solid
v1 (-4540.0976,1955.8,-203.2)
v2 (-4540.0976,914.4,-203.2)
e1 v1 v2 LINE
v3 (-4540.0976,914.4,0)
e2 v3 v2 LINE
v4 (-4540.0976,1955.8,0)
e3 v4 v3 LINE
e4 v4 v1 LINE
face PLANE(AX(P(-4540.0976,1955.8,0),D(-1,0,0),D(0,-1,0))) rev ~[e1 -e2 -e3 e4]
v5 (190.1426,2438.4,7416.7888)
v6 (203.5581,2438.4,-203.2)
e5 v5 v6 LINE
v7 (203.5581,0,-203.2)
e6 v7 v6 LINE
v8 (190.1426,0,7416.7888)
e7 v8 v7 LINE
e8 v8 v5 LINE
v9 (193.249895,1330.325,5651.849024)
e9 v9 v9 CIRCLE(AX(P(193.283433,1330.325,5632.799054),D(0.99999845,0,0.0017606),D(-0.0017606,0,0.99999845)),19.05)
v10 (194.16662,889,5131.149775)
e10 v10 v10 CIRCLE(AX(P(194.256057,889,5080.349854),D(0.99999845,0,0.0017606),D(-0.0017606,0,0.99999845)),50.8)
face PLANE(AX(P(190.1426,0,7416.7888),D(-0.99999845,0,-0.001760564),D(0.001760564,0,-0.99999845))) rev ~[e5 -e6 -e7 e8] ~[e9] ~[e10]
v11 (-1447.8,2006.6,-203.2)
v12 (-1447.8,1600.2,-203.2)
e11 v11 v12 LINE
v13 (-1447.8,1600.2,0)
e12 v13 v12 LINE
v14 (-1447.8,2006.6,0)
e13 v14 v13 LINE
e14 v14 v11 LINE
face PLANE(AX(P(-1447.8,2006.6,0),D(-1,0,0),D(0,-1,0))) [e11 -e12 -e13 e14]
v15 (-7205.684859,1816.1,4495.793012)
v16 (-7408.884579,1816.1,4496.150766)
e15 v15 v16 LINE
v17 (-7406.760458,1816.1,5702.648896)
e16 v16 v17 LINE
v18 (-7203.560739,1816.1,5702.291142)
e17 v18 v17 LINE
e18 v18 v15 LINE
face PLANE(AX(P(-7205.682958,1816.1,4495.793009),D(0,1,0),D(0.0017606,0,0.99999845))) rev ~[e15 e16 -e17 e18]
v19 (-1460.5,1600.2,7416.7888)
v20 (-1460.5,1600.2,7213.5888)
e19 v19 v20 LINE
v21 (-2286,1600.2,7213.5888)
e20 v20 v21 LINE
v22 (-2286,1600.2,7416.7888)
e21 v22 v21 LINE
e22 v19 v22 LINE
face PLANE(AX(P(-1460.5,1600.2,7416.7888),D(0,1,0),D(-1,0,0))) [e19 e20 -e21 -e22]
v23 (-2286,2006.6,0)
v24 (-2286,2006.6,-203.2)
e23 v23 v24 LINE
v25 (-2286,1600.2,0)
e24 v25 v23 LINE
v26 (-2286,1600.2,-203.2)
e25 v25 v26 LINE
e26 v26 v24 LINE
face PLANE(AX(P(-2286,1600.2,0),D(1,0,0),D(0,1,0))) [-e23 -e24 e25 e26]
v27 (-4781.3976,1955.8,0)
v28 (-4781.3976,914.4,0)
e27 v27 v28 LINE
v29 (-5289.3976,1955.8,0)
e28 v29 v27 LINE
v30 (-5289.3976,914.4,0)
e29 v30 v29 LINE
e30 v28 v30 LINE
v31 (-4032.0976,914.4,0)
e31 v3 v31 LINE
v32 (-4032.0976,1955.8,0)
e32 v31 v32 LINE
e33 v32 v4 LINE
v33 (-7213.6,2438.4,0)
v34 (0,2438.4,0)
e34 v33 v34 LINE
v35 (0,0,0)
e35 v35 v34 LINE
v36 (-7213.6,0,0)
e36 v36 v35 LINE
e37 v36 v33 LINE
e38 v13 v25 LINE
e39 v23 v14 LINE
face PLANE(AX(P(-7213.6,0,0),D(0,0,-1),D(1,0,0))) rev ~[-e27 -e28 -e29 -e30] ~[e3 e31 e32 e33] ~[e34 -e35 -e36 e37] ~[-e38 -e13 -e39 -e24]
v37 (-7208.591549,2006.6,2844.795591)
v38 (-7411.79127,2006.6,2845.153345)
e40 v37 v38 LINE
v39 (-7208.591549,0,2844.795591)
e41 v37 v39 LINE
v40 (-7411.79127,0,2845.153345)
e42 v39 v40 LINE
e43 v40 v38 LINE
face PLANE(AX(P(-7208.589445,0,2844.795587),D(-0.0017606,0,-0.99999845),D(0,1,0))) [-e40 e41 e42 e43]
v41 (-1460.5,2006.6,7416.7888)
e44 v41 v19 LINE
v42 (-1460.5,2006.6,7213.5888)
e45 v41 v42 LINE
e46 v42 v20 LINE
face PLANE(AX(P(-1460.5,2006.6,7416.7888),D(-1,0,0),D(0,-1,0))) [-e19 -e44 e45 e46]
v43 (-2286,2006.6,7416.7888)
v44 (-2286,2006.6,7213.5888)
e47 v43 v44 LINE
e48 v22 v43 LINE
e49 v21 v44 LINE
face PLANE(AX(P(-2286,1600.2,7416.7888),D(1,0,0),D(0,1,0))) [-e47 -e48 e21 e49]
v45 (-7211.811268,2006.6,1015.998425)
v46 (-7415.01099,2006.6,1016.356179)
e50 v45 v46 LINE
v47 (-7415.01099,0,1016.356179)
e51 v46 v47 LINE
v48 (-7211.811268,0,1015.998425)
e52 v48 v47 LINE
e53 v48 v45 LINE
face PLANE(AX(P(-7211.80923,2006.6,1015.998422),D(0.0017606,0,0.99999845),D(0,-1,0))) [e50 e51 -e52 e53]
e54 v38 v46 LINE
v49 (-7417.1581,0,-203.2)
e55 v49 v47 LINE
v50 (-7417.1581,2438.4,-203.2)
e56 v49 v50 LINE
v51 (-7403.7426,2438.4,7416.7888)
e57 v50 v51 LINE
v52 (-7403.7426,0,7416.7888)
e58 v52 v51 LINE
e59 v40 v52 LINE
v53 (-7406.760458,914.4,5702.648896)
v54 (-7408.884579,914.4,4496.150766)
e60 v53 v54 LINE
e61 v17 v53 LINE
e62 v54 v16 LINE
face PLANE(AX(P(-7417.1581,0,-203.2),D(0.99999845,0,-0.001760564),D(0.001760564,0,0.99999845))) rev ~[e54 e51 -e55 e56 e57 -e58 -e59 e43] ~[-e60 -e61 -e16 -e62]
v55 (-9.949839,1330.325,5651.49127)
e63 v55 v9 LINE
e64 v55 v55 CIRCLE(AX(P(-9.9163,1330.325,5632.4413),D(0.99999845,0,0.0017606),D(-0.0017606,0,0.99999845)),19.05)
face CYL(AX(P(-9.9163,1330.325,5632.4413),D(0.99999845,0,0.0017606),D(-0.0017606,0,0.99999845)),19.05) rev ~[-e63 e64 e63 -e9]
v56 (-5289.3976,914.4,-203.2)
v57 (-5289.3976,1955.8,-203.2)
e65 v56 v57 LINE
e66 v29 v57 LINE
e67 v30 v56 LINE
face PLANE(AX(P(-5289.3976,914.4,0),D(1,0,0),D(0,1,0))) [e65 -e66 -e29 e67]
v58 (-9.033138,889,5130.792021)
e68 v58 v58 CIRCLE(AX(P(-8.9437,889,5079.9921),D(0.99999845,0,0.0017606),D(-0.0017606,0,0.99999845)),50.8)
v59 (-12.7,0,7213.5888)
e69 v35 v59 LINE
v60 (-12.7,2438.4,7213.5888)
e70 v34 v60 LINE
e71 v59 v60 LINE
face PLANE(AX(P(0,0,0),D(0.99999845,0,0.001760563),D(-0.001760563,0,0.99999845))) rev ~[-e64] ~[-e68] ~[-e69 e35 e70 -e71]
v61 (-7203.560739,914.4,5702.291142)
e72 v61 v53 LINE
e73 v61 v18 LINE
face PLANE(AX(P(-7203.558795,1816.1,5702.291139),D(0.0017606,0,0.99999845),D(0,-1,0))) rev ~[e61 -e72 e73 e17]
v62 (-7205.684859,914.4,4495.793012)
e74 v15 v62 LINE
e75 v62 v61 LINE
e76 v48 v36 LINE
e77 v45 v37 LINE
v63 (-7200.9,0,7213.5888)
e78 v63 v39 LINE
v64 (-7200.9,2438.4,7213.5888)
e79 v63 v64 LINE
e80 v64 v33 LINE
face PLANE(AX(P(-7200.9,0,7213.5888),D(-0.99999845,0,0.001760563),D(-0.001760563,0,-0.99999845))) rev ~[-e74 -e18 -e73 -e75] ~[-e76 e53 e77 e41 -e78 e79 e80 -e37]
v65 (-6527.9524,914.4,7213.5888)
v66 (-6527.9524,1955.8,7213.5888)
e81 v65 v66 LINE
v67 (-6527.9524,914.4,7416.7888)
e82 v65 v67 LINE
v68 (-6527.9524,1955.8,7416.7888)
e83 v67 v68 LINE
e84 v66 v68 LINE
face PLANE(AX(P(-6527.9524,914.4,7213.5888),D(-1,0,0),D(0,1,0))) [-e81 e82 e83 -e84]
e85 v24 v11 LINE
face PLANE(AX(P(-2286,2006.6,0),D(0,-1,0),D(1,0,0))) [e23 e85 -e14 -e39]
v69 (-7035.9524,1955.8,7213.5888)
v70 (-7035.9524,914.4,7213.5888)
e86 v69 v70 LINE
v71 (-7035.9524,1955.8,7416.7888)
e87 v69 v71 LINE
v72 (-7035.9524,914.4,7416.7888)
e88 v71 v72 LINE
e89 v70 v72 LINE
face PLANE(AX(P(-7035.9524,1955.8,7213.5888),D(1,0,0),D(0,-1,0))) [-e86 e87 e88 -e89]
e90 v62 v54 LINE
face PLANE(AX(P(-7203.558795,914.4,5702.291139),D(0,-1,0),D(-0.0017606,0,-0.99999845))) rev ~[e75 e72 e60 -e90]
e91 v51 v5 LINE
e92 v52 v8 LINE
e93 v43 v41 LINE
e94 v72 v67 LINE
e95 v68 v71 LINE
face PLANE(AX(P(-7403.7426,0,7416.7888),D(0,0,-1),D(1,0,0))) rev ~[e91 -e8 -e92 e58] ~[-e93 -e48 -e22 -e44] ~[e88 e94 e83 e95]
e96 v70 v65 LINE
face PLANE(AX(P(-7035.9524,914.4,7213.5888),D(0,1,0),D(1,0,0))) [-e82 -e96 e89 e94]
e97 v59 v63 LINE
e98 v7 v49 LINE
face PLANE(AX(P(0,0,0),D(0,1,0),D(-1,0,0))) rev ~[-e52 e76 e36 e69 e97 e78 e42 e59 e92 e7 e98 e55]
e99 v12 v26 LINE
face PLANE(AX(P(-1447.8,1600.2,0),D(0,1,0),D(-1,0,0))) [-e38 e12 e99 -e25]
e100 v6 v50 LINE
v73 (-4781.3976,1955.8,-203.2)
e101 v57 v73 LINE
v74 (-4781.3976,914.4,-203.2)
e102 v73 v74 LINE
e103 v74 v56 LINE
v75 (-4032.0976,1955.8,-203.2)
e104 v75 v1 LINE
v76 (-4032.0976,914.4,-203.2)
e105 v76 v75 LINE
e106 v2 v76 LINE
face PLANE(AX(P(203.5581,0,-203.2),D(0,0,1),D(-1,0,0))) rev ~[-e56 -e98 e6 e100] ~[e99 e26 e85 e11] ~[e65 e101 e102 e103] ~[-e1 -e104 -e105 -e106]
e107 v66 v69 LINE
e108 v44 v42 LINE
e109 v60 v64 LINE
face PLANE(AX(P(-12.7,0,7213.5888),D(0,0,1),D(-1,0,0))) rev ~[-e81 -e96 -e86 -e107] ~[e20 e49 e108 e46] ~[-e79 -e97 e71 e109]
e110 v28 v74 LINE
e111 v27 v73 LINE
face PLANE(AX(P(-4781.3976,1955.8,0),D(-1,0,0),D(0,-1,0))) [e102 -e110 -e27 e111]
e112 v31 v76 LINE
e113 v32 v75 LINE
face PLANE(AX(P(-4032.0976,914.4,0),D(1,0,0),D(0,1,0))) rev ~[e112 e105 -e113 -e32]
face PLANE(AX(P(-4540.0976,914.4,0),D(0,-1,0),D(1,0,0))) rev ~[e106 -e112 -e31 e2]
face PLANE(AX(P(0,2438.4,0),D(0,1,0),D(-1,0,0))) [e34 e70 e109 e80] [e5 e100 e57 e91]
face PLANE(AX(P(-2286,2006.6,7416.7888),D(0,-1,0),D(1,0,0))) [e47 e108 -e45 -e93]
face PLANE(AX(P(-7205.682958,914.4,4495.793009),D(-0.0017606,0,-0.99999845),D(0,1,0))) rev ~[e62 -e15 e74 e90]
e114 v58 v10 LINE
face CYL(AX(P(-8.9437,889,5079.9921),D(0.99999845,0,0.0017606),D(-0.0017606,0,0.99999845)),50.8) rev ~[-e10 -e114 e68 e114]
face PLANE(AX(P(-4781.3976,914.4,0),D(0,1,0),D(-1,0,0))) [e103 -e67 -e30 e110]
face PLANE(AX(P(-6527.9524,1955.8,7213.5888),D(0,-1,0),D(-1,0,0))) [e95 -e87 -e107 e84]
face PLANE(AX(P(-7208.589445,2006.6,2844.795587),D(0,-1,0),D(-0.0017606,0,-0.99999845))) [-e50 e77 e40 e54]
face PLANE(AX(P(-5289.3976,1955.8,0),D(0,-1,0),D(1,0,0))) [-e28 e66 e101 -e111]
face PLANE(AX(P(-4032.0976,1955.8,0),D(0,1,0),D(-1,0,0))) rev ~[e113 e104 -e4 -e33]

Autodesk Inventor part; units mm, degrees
ref_plane "YZ Plane" through (0, 0, 0) normal (1, 0, 0) x (0, 1, 0)
ref_plane "XZ Plane" through (0, 0, 0) normal (0, 1, 0) x (-1, 0, 0)
ref_plane "XY Plane" through (0, 0, 0) normal (0, 0, 1) x (1, 0, 0)
sketch "Sketch1" plane through (0, 0, 0) normal (0, 1, 0) x (-1, 0, 0)
  line L0 (0, 0) -> (12.7, 7213.5888)
  line L1 (12.7, 7213.5888) -> (7200.9, 7213.5888)
  line L2 (7200.9, 7213.5888) -> (7213.6, 0)
  line L3 (7213.6, 0) -> (0, 0)
  line L4 (7403.7426, 7416.7888) -> (-190.1426, 7416.7888)
  line L5 (-190.1426, 7416.7888) -> (-203.5581, -203.2)
  line L6 (-203.5581, -203.2) -> (7417.1581, -203.2)
  line L7 (7417.1581, -203.2) -> (7403.7426, 7416.7888)
  dimension "d1" = 7188.2
  dimension "d3" = 12.7
  dimension "d4" = 7213.6
  dimension "d5" = 7213.6
  dimension "d6" = 203.2
  dimension "d8" = 7213.6
extrude "Extrusion1" add sketch "Sketch1" along normal blind 2438.4
sketch "Sketch4" plane through (-12.7, 0, 7213.5888) normal (-0.9999985, 0, -0.0017606) x (-0.0017606, 0, 0.9999985)
  line L0 (-7213.6, 0) -> (0, 0) projected
  line L1 (-7213.6, 0) -> (-7213.6, 2438.4) projected
  line L2 (0, 0) -> (0, 2438.4) projected
  point P0 (-1581.15, 1330.325)
  dimension "d27" = 1330.325
  dimension "d139" = 1581.15
hole "Hole1" at (-9.9163, 1330.325, 5632.4413) direction (0.9999985, 0, 0.0017606) diameter 38.1 end through all
sketch "Sketch5" plane through (-12.7, 0, 7213.5888) normal (-0.9999985, 0, -0.0017606) x (-0.0017606, 0, 0.9999985)
  line L0 (-7213.6, 0) -> (0, 0) projected
  line L1 (-7213.6, 0) -> (-7213.6, 2438.4) projected
  point P0 (-2133.6, 889)
  dimension "d36" = 889
  dimension "d37" = 5080
hole "Hole2" at (-8.9437, 889, 5079.9921) direction (0.9999985, 0, 0.0017606) diameter 101.6 end through all
sketch "Sketch6" plane through (-7213.6, 0, 0) normal (0, 0, 1) x (1, 0, 0)
  line L0 (7417.1581, 2438.4) -> (-203.5581, 2438.4) projected
  line L1 (7213.6, 0) -> (7213.6, 2438.4) projected
  line L2 (0, 0) -> (7213.6, 0) projected
  line L3 (4927.6, 2006.6) -> (5765.8, 2006.6)
  line L4 (5765.8, 2006.6) -> (5765.8, 1600.2)
  line L5 (5765.8, 1600.2) -> (4927.6, 1600.2)
  line L6 (4927.6, 1600.2) -> (4927.6, 2006.6)
  dimension "d119" = 1447.8
  dimension "d121" = 406.4
  dimension "d136" = 838.2
  dimension "d137" = 1600.2
extrude "Extrusion3" cut sketch "Sketch6" against normal up to surface (203.2 mm away)
sketch "Sketch7" plane through (-7213.6, 0, 0) normal (0.9999985, 0, -0.0017606) x (-0.0017606, 0, -0.9999985)
  line L0 (-7213.6, 0) -> (0, 0) projected
  line L1 (-1016, 0) -> (-2844.8, 0)
  line L2 (-2844.8, 0) -> (-2844.8, 2006.6)
  line L3 (-2844.8, 2006.6) -> (-1016, 2006.6)
  line L4 (-1016, 2006.6) -> (-1016, 0)
  line L5 (0, 0) -> (0, 2438.4) projected
  point P0 (-12.7, 0)
  point P1 (-2844.8, 0)
  dimension "d51" = 1016
  dimension "d52" = 2006.6
  dimension "d53" = 1828.8
extrude "Extrusion4" cut sketch "Sketch7" against normal up to surface (203.2 mm away)
sketch "Sketch8" plane through (-7200.9, 0, 7213.5888) normal (0.9999985, 0, -0.0017606) x (-0.0017606, 0, -0.9999985)
  line L0 (2717.8, 1816.1) -> (1511.3, 1816.1)
  line L1 (1511.3, 1816.1) -> (1511.3, 914.4)
  line L2 (1511.3, 914.4) -> (2717.8, 914.4)
  line L3 (2717.8, 914.4) -> (2717.8, 1816.1)
  line L4 (0, 0) -> (0, 2438.4) projected
  line L5 (0, 0) -> (4368.8, 0) projected
  point P0 (7200.9, 0)
  dimension "d56" = 2717.8
  dimension "d57" = 1206.5
  dimension "d58" = 901.7
  dimension "d59" = 914.4
extrude "Extrusion5" cut sketch "Sketch8" against normal up to surface (203.2 mm away)
sketch "Sketch9" plane through (-7213.6, 0, 0) normal (0, 0, 1) x (1, 0, 0)
  line L0 (3181.5024, 1955.8) -> (2673.5024, 1955.8)
  line L1 (2673.5024, 1955.8) -> (2673.5024, 914.4)
  line L2 (2673.5024, 914.4) -> (3181.5024, 914.4)
  line L3 (3181.5024, 914.4) -> (3181.5024, 1955.8)
  line L4 (0, 0) -> (7213.6, 0) projected
  line L5 (7213.6, 0) -> (7213.6, 2438.4) projected
  dimension "d63" = 1041.4
  dimension "d64" = 508
  dimension "d65" = 914.4
  dimension "d66" = 4540.0976
extrude "Extrusion6" cut sketch "Sketch9" against normal up to surface (203.2 mm away)
sketch "Sketch10" plane through (-7213.6, 0, 0) normal (0, 0, 1) x (1, 0, 0)
  line L0 (2432.2024, 914.4) -> (1924.2024, 914.4)
  line L1 (1924.2024, 914.4) -> (1924.2024, 1955.8)
  line L2 (1924.2024, 1955.8) -> (2432.2024, 1955.8)
  line L3 (2432.2024, 1955.8) -> (2432.2024, 914.4)
  line L4 (0, 0) -> (7213.6, 0) projected
  line L5 (0, 0) -> (0, 2438.4) projected
  dimension "d69" = 914.4
  dimension "d70" = 1041.4
  dimension "d71" = 508
  dimension "d72" = 1924.2024
extrude "Extrusion7" cut sketch "Sketch10" against normal up to surface (203.2 mm away)
sketch "Sketch11" plane through (-12.7, 0, 7213.5888) normal (0, 0, -1) x (-1, 0, 0)
  line L0 (7023.2524, 914.4) -> (6515.2524, 914.4)
  line L1 (6515.2524, 914.4) -> (6515.2524, 1955.8)
  line L2 (6515.2524, 1955.8) -> (7023.2524, 1955.8)
  line L3 (7023.2524, 1955.8) -> (7023.2524, 914.4)
  line L4 (7188.2, 0) -> (7188.2, 2438.4) projected
  line L5 (0, 0) -> (7188.2, 0) projected
  point P0 (-12.7, 0)
  dimension "d75" = 164.9476
  dimension "d76" = 1041.4
  dimension "d79" = 508
  dimension "d80" = 914.4
extrude "Extrusion8" cut sketch "Sketch11" against normal up to surface (203.2 mm away)
sketch "Sketch20" plane through (-7403.7426, 0, 7416.7888) normal (0, 0, 1) x (1, 0, 0)
  line L0 (5117.7426, 2006.6) -> (5943.2426, 2006.6)
  line L1 (5943.2426, 2006.6) -> (5943.2426, 1600.2)
  line L2 (5943.2426, 1600.2) -> (5117.7426, 1600.2)
  line L3 (5117.7426, 1600.2) -> (5117.7426, 2006.6)
  line L4 (0, 2438.4) -> (7593.8851, 2438.4) projected
  line L5 (0, 0) -> (7593.8851, 0) projected
  point P0 (7403.7426, 0)
  point P1 (7391.0426, 2438.4)
  dimension "d129" = 406.4
  dimension "d134" = 825.5
  dimension "d135" = 1600.2
  dimension "d138" = 1447.8
extrude "Extrusion16" cut sketch "Sketch20" against normal up to surface (203.2 mm away)
properties part number "Exterior_Walls" material "Concrete"
